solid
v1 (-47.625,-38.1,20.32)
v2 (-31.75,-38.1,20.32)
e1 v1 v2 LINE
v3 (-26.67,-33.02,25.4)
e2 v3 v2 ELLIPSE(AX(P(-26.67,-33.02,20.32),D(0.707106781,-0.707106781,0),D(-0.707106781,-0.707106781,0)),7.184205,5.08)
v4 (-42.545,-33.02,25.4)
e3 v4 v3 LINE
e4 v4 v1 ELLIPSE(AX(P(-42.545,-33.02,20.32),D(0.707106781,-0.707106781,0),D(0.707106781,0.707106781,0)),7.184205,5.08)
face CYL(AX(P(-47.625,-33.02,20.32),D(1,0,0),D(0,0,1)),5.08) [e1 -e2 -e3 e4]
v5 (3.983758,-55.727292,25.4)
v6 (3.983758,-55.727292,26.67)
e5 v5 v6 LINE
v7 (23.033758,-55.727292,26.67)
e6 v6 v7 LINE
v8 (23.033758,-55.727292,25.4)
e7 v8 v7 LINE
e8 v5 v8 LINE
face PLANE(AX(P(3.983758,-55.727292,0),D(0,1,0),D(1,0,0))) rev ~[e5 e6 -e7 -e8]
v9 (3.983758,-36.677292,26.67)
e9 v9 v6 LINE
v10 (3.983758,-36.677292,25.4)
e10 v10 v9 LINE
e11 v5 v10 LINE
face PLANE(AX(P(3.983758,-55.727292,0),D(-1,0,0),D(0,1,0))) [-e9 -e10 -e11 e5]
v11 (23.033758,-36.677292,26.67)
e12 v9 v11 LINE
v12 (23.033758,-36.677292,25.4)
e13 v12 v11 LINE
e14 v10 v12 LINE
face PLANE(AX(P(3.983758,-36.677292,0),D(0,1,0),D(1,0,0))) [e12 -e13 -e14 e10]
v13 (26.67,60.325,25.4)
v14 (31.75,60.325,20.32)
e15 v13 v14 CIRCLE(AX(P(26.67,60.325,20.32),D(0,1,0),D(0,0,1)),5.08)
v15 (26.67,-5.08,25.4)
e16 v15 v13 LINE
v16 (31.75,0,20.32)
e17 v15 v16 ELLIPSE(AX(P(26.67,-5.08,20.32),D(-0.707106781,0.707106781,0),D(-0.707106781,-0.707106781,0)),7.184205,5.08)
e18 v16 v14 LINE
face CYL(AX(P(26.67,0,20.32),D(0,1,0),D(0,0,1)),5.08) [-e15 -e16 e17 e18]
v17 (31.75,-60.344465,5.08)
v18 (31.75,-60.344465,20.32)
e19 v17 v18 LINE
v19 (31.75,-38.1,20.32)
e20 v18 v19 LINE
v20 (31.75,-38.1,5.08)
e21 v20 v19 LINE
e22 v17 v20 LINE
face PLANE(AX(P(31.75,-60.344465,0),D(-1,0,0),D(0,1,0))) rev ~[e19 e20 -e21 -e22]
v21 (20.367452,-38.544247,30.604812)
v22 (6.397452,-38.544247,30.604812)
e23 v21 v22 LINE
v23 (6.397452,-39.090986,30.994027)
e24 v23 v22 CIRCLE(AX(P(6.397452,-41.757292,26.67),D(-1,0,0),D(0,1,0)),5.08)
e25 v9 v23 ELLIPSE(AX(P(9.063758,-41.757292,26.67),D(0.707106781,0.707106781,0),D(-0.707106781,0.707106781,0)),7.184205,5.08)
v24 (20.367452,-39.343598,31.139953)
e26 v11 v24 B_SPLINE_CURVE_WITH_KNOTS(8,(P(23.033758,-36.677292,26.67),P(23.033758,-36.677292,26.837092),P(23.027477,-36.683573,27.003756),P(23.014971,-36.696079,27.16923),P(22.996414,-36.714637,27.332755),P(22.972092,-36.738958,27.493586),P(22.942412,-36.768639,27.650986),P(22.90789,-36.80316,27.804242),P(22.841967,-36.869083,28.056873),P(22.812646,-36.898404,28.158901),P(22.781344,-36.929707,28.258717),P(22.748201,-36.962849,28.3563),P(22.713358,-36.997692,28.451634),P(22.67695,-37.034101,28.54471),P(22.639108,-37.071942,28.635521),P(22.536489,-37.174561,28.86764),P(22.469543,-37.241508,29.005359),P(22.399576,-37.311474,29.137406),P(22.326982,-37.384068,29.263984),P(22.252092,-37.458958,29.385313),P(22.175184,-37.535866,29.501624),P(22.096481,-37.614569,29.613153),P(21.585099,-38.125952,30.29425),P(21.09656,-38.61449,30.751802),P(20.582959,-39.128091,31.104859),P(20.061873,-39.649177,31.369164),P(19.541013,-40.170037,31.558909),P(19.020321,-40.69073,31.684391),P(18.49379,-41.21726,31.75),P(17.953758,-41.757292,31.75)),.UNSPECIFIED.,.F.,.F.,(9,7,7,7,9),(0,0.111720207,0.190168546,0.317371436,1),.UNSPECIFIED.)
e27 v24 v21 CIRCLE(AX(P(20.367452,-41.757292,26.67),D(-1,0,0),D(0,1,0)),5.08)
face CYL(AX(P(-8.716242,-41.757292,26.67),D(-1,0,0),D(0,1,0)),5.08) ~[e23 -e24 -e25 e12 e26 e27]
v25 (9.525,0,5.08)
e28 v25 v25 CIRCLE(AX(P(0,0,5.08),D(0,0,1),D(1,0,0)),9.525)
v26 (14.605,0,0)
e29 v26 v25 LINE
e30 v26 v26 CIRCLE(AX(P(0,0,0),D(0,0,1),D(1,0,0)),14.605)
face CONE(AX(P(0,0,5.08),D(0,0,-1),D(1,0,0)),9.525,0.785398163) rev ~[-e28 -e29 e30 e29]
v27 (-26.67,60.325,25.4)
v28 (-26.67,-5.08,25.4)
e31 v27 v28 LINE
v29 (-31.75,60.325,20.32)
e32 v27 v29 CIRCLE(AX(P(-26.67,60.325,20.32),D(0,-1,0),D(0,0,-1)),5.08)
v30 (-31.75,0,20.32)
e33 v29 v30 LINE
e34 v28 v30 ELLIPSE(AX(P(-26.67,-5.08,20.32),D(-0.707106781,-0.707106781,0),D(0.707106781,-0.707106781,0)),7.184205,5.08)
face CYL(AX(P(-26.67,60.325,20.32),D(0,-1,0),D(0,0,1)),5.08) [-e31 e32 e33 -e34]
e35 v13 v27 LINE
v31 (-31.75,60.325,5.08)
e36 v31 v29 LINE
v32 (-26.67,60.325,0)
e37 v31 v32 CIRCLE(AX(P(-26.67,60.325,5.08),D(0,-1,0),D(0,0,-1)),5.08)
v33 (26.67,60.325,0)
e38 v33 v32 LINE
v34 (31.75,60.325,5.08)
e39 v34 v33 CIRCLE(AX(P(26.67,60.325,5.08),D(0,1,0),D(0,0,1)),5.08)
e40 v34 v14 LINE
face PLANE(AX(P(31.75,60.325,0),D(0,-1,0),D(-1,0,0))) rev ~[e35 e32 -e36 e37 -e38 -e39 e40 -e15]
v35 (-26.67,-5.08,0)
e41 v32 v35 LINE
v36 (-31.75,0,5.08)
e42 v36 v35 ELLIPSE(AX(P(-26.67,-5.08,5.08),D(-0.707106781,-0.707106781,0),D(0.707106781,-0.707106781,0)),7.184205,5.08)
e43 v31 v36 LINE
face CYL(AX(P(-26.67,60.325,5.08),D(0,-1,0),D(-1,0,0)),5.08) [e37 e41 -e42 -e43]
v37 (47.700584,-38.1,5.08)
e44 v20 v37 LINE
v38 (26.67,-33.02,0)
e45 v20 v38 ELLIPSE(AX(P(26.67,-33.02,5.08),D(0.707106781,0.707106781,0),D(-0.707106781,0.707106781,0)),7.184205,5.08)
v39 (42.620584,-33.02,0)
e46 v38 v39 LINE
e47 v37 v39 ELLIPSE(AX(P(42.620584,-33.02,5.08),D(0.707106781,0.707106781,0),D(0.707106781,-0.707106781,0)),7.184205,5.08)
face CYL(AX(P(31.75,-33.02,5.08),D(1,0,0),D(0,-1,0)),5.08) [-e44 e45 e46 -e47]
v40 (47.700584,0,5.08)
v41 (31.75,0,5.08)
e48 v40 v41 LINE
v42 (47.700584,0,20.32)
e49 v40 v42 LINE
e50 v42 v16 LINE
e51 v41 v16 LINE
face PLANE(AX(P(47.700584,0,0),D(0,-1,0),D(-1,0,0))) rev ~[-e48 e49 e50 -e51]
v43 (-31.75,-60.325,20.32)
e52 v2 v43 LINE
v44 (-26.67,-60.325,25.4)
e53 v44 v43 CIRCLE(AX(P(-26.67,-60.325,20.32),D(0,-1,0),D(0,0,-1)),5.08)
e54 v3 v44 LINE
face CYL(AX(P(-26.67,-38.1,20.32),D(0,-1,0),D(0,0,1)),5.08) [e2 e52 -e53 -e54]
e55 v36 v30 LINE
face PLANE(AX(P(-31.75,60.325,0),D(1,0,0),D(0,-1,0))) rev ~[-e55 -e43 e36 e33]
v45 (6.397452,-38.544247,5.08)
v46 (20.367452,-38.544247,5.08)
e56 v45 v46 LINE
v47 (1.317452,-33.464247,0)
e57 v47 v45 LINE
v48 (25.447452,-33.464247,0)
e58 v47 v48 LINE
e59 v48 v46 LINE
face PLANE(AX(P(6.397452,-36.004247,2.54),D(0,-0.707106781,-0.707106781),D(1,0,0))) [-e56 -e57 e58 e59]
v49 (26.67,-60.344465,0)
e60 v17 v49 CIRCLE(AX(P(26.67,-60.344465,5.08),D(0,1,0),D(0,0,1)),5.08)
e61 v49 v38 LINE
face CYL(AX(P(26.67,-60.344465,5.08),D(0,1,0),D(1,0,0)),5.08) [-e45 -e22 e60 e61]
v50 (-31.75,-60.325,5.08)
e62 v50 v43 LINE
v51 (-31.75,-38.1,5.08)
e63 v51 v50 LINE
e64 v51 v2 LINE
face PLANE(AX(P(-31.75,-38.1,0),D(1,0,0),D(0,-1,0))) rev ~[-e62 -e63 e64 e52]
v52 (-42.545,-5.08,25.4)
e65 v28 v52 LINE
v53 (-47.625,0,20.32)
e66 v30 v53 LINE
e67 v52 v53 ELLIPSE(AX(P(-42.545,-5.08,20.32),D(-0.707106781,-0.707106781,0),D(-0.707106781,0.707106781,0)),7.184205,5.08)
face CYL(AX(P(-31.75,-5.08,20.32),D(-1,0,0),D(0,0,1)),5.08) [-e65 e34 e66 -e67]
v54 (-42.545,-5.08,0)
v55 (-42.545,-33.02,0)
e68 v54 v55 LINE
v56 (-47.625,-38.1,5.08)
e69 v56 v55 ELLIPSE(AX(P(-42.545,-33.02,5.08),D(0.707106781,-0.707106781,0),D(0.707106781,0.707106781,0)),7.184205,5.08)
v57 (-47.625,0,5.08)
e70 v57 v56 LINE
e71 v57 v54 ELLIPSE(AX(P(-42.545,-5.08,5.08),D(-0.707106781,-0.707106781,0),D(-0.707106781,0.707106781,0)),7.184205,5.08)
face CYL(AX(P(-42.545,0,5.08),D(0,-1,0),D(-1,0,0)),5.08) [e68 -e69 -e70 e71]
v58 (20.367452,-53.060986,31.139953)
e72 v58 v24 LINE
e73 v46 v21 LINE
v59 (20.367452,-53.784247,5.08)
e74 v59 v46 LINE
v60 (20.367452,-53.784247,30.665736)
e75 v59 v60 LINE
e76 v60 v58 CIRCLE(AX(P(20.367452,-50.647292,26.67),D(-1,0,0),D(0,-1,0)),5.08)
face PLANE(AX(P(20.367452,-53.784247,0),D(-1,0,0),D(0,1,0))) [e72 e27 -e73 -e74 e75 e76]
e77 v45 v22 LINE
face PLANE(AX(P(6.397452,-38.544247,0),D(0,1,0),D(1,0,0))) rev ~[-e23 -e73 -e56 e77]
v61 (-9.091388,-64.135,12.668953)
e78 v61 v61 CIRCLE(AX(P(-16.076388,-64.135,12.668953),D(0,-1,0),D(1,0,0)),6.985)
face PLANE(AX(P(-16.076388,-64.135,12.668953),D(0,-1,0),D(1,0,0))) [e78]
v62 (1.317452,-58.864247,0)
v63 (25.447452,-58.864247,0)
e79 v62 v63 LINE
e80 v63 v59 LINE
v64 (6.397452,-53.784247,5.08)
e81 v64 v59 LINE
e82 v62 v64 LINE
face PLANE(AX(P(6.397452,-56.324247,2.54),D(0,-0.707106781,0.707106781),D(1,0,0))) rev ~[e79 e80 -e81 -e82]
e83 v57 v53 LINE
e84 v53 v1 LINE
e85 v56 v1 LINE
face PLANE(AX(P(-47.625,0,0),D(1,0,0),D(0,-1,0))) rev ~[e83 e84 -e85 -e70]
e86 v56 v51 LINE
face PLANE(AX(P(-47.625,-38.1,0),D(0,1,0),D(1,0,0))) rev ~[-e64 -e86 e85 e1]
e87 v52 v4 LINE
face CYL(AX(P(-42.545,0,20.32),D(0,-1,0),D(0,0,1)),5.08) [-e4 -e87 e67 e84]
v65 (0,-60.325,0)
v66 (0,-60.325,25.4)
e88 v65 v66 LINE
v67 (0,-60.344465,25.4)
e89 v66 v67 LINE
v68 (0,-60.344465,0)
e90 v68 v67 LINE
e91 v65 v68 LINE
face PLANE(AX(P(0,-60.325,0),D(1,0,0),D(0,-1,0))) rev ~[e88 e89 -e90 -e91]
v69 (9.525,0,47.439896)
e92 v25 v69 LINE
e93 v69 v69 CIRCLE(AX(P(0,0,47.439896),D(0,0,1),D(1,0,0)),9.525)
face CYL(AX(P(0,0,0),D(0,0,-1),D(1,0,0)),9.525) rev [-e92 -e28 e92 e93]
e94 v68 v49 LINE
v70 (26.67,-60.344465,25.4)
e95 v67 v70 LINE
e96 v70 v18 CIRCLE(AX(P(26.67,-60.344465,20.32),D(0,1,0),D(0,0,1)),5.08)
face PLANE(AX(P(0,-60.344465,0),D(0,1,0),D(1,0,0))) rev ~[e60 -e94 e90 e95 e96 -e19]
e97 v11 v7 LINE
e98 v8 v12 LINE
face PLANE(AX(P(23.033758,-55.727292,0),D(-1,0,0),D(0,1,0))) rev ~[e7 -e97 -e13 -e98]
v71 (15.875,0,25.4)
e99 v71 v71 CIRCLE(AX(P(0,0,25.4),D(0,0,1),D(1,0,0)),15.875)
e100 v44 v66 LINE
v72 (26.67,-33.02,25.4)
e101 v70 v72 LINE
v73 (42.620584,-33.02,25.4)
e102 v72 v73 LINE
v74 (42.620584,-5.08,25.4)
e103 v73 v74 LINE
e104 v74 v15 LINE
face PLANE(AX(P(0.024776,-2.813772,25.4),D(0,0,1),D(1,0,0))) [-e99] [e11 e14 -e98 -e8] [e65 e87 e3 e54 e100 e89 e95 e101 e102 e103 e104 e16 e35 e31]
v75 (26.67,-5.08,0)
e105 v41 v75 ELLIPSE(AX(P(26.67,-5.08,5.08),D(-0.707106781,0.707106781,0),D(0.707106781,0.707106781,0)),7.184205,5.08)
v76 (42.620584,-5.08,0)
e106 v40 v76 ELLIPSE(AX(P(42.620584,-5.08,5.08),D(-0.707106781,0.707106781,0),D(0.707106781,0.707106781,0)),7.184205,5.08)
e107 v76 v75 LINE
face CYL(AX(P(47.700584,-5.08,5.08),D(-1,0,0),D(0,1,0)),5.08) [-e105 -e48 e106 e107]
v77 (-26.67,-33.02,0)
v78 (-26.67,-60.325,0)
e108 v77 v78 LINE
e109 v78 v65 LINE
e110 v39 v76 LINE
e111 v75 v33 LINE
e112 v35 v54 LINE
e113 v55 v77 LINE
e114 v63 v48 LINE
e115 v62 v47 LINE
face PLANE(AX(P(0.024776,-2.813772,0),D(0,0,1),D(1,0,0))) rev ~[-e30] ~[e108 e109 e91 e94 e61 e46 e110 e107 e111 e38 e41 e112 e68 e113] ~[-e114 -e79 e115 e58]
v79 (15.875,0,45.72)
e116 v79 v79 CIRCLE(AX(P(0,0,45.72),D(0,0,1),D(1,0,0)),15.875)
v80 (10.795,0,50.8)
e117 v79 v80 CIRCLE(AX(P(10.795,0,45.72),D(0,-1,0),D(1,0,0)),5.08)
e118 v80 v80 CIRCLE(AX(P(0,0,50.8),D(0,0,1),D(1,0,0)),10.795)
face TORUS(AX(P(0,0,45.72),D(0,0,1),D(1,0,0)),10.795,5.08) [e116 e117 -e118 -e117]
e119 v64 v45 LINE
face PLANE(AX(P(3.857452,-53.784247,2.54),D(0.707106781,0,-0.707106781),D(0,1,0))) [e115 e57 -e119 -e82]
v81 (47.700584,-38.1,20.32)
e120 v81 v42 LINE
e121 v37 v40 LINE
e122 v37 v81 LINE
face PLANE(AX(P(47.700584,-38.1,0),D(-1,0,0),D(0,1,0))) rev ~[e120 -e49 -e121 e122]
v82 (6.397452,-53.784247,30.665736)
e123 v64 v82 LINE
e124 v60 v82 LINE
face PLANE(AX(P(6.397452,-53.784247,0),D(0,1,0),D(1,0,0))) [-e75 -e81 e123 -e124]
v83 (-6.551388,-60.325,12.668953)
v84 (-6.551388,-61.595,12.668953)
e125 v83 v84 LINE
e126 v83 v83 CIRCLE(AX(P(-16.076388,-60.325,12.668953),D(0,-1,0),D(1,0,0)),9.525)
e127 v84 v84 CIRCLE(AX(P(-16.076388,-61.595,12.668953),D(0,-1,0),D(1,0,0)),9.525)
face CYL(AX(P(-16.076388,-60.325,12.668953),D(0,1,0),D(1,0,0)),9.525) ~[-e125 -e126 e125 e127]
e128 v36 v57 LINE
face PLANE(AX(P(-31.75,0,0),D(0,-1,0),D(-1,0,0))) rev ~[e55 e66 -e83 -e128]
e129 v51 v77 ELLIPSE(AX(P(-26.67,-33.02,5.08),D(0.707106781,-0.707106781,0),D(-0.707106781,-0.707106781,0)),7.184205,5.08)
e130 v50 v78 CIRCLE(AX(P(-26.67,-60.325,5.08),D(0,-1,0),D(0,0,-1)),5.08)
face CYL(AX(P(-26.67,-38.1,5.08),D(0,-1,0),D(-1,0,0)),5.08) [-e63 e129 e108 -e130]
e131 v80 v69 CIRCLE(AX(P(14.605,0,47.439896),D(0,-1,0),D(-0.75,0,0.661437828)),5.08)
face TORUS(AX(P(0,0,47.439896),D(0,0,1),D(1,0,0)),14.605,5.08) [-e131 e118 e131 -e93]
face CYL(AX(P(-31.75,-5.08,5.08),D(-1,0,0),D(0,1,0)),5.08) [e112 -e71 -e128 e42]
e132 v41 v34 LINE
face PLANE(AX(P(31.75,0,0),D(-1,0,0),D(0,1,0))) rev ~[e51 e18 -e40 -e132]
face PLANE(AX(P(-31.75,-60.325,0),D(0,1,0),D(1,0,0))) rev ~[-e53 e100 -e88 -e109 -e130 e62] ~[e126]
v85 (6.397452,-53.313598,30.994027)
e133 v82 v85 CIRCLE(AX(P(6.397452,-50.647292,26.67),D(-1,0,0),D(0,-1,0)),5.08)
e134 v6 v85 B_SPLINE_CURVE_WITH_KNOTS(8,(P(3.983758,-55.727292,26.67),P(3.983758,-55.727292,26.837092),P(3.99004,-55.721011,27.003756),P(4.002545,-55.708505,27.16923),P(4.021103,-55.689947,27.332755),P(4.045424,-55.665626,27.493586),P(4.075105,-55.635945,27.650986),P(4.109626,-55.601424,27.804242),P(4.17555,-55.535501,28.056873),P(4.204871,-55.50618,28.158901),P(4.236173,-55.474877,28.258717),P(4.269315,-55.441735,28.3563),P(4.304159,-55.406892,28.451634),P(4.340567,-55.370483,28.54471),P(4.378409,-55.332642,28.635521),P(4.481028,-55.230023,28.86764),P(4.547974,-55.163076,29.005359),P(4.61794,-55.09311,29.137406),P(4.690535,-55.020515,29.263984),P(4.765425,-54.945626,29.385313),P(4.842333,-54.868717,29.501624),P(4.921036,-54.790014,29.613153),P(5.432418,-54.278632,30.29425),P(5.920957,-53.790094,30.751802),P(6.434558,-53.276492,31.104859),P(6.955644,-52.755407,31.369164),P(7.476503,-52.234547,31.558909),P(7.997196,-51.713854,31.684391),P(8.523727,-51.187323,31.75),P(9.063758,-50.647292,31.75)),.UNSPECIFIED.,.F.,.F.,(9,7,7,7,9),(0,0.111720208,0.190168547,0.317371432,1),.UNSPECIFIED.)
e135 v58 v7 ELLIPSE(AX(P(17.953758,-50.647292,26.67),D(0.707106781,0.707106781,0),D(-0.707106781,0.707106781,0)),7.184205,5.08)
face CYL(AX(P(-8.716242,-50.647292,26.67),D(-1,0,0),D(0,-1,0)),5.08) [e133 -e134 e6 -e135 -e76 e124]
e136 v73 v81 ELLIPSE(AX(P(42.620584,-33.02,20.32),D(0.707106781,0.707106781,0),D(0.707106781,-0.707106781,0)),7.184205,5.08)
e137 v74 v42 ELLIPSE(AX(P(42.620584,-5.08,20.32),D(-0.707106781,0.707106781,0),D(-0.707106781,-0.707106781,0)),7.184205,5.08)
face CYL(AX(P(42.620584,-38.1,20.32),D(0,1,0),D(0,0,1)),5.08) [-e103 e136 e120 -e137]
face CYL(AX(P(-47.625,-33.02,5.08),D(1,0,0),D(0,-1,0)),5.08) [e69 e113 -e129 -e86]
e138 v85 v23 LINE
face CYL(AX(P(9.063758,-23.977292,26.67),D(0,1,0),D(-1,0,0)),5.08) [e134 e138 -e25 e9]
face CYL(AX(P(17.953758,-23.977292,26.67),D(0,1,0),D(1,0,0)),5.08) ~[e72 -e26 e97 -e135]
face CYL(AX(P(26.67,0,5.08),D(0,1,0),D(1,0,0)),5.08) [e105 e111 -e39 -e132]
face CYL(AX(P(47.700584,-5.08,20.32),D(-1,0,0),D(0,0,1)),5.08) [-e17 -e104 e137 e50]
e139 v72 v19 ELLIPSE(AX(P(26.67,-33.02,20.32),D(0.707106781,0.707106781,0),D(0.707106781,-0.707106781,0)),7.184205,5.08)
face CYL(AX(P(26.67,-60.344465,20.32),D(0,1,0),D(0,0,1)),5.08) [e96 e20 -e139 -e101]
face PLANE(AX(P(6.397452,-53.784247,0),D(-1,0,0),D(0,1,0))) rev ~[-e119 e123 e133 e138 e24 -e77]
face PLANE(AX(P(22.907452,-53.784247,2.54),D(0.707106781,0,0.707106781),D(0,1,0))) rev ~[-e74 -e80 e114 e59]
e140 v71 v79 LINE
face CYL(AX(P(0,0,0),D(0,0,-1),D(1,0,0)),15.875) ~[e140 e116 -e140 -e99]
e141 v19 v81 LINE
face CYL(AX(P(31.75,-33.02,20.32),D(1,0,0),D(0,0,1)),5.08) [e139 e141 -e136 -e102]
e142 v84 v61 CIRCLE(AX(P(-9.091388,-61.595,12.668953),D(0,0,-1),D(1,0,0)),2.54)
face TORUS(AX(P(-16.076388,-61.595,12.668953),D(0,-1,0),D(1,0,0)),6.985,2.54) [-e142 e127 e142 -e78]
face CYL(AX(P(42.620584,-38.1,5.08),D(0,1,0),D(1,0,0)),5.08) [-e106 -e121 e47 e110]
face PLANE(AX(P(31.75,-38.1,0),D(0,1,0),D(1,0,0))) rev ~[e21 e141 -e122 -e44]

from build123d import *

# Parameters (mm, degrees)
F0_W        = 19.05
F0_H        = 19.05
F0_R        = 15.875
F1_DEPTH    = 25.4
F0_R_2      = 9.525
F2_DEPTH    = 50.8
F0_W_2      = 13.97
F0_H_2      = 15.24
F3_DEPTH    = 31.75
F4_R        = 9.525
F5_DEPTH    = 3.81
F6_R        = 2.54
F7_R        = 5.08
F9_T1_DEPTH = 44.45
F9_T3_DEPTH = 44.45
F10_R       = 5.08
F11_SIZE    = 5.08
F12_SIZE    = 5.08


# Not quite as in the source:
# - a fillet or chamfer that OpenCascade refuses, or shapes differently, is made with other operations: its cross-section is extruded or revolved along the edge and cut away or added


with BuildPart() as f1:
    # F0 (on Top) → F1 (new body)
    with BuildSketch(Plane.XY):
        Polygon((31.75, 60.325), (0, 60.325), (-31.75, 60.325), (-31.75, 0), (-47.625, 0), (-47.625, -38.1), (-31.75, -38.1), (-31.75, -60.325), (0, -60.325), (0, -60.3444650769), (31.75, -60.3444650769), (31.75, -38.1), (47.7005839348, -38.1), (47.7005839348, 0), (47.625, 0), (31.75, 0), align=None)
        with Locations((13.5087583899, -46.2022918522)):
            Rectangle(F0_W, F0_H, mode=Mode.SUBTRACT)
        Circle(F0_R, mode=Mode.SUBTRACT)
    extrude(amount=F1_DEPTH)

    # F0 (on Top) → F2 (join)
    with BuildSketch(Plane.XY):
        Circle(F0_R)
        Circle(F0_R_2, mode=Mode.SUBTRACT)
    extrude(amount=F2_DEPTH)

    # F0 (on Top) → F3 (join)
    with BuildSketch(Plane.XY):
        with Locations((13.5087583899, -46.2022918522)):
            Rectangle(F0_W, F0_H)
        with Locations((13.3824522054, -46.1642474878)):
            Rectangle(F0_W_2, F0_H_2, mode=Mode.SUBTRACT)
    extrude(amount=F3_DEPTH)

    # F4 (on face) → F5 (join)
    with BuildSketch(Plane.XZ.offset(60.325)):
        with Locations((-16.0763879821, 12.6689534055)):
            Circle(F4_R)
    extrude(amount=F5_DEPTH)

    # F6
    f6_edges = [f1.edges().sort_by_distance(p)[0] for p in [
        (-25.601388, -64.135, 12.668953),
    ]]
    fillet(f6_edges, radius=F6_R)

    # F7
    f7_edges = [f1.edges().sort_by_distance(p)[0] for p in [
        (-15.875, 0, 50.8),
    ]]
    fillet(f7_edges, radius=F7_R)

    # F8: fillet of radius 5.08 on 1 edges, made by hand

    # F8_s1 → F8_t2 (revolve, cut)
    with BuildSketch(Plane.XZ):
        with BuildLine():
            ThreePointArc((10.795, 50.8), (9.8530951188, 49.2359470592), (9.525, 47.4398958349))
            Line((9.525, 47.4398958349), (9.525, 50.8))
            Line((9.525, 50.8), (10.795, 50.8))
        make_face()
    revolve(axis=Axis((0, 0, 50.8), (0, 0, 1)), mode=Mode.SUBTRACT)

    # F9: fillet of radius 5.08 on 4 edges, made by hand

    # F9_s2 → F9_t1 (cut)
    with BuildSketch(Plane.XZ.offset(23.9772918522)):
        with BuildLine():
            ThreePointArc((3.9837583899, 26.67), (5.4716559415, 30.2621024484), (9.0637583899, 31.75))
            Line((9.0637583899, 31.75), (3.9837583899, 31.75))
            Line((3.9837583899, 31.75), (3.9837583899, 26.67))
        make_face()
        with BuildLine():
            ThreePointArc((23.0337583899, 26.67), (21.5458608384, 30.2621024484), (17.9537583899, 31.75))
            Line((17.9537583899, 31.75), (23.0337583899, 31.75))
            Line((23.0337583899, 31.75), (23.0337583899, 26.67))
        make_face()
    extrude(amount=F9_T1_DEPTH, mode=Mode.SUBTRACT)

    # F9_s4 → F9_t3 (cut)
    with BuildSketch(Plane.YZ.offset(-8.7162416101)):
        with BuildLine():
            ThreePointArc((-36.6772918522, 26.67), (-38.1651894038, 30.2621024484), (-41.7572918522, 31.75))
            Line((-41.7572918522, 31.75), (-36.6772918522, 31.75))
            Line((-36.6772918522, 31.75), (-36.6772918522, 26.67))
        make_face()
        with BuildLine():
            ThreePointArc((-55.7272918522, 26.67), (-54.2393943007, 30.2621024484), (-50.6472918522, 31.75))
            Line((-50.6472918522, 31.75), (-55.7272918522, 31.75))
            Line((-55.7272918522, 31.75), (-55.7272918522, 26.67))
        make_face()
    extrude(amount=F9_T3_DEPTH, mode=Mode.SUBTRACT)

    # F10
    f10_edges = [f1.edges().sort_by_distance(p)[0] for p in [
        (39.725292, -38.1, 25.4),
        (31.75, -49.222233, 25.4),
        (-31.75, -49.2125, 25.4),
        (-39.6875, -38.1, 25.4),
        (-31.75, 30.1625, 25.4),
        (-39.6875, 0, 25.4),
        (39.725292, 0, 25.4),
        (31.75, 30.1625, 25.4),
        (-31.75, -49.2125, 0),
        (-31.75, 30.1625, 0),
        (-39.6875, 0, 0),
        (-39.6875, -38.1, 0),
        (-47.625, -19.05, 0),
        (31.75, 30.1625, 0),
        (31.75, -49.222233, 0),
        (39.725292, -38.1, 0),
        (47.700584, -19.05, 0),
        (39.725292, 0, 0),
        (47.700584, -19.05, 25.4),
        (-47.625, -19.05, 25.4),
    ]]
    fillet(f10_edges, radius=F10_R)

    # F11
    f11_edges = [f1.edges().sort_by_distance(p)[0] for p in [
        (13.382452, -38.544247, 0),
        (20.367452, -46.164247, 0),
        (13.382452, -53.784247, 0),
        (6.397452, -46.164247, 0),
    ]]
    chamfer(f11_edges, length=F11_SIZE)

    # F12
    f12_edges = [f1.edges().sort_by_distance(p)[0] for p in [
        (-9.525, 0, 0),
    ]]
    chamfer(f12_edges, length=F12_SIZE)


solid = f1.part
